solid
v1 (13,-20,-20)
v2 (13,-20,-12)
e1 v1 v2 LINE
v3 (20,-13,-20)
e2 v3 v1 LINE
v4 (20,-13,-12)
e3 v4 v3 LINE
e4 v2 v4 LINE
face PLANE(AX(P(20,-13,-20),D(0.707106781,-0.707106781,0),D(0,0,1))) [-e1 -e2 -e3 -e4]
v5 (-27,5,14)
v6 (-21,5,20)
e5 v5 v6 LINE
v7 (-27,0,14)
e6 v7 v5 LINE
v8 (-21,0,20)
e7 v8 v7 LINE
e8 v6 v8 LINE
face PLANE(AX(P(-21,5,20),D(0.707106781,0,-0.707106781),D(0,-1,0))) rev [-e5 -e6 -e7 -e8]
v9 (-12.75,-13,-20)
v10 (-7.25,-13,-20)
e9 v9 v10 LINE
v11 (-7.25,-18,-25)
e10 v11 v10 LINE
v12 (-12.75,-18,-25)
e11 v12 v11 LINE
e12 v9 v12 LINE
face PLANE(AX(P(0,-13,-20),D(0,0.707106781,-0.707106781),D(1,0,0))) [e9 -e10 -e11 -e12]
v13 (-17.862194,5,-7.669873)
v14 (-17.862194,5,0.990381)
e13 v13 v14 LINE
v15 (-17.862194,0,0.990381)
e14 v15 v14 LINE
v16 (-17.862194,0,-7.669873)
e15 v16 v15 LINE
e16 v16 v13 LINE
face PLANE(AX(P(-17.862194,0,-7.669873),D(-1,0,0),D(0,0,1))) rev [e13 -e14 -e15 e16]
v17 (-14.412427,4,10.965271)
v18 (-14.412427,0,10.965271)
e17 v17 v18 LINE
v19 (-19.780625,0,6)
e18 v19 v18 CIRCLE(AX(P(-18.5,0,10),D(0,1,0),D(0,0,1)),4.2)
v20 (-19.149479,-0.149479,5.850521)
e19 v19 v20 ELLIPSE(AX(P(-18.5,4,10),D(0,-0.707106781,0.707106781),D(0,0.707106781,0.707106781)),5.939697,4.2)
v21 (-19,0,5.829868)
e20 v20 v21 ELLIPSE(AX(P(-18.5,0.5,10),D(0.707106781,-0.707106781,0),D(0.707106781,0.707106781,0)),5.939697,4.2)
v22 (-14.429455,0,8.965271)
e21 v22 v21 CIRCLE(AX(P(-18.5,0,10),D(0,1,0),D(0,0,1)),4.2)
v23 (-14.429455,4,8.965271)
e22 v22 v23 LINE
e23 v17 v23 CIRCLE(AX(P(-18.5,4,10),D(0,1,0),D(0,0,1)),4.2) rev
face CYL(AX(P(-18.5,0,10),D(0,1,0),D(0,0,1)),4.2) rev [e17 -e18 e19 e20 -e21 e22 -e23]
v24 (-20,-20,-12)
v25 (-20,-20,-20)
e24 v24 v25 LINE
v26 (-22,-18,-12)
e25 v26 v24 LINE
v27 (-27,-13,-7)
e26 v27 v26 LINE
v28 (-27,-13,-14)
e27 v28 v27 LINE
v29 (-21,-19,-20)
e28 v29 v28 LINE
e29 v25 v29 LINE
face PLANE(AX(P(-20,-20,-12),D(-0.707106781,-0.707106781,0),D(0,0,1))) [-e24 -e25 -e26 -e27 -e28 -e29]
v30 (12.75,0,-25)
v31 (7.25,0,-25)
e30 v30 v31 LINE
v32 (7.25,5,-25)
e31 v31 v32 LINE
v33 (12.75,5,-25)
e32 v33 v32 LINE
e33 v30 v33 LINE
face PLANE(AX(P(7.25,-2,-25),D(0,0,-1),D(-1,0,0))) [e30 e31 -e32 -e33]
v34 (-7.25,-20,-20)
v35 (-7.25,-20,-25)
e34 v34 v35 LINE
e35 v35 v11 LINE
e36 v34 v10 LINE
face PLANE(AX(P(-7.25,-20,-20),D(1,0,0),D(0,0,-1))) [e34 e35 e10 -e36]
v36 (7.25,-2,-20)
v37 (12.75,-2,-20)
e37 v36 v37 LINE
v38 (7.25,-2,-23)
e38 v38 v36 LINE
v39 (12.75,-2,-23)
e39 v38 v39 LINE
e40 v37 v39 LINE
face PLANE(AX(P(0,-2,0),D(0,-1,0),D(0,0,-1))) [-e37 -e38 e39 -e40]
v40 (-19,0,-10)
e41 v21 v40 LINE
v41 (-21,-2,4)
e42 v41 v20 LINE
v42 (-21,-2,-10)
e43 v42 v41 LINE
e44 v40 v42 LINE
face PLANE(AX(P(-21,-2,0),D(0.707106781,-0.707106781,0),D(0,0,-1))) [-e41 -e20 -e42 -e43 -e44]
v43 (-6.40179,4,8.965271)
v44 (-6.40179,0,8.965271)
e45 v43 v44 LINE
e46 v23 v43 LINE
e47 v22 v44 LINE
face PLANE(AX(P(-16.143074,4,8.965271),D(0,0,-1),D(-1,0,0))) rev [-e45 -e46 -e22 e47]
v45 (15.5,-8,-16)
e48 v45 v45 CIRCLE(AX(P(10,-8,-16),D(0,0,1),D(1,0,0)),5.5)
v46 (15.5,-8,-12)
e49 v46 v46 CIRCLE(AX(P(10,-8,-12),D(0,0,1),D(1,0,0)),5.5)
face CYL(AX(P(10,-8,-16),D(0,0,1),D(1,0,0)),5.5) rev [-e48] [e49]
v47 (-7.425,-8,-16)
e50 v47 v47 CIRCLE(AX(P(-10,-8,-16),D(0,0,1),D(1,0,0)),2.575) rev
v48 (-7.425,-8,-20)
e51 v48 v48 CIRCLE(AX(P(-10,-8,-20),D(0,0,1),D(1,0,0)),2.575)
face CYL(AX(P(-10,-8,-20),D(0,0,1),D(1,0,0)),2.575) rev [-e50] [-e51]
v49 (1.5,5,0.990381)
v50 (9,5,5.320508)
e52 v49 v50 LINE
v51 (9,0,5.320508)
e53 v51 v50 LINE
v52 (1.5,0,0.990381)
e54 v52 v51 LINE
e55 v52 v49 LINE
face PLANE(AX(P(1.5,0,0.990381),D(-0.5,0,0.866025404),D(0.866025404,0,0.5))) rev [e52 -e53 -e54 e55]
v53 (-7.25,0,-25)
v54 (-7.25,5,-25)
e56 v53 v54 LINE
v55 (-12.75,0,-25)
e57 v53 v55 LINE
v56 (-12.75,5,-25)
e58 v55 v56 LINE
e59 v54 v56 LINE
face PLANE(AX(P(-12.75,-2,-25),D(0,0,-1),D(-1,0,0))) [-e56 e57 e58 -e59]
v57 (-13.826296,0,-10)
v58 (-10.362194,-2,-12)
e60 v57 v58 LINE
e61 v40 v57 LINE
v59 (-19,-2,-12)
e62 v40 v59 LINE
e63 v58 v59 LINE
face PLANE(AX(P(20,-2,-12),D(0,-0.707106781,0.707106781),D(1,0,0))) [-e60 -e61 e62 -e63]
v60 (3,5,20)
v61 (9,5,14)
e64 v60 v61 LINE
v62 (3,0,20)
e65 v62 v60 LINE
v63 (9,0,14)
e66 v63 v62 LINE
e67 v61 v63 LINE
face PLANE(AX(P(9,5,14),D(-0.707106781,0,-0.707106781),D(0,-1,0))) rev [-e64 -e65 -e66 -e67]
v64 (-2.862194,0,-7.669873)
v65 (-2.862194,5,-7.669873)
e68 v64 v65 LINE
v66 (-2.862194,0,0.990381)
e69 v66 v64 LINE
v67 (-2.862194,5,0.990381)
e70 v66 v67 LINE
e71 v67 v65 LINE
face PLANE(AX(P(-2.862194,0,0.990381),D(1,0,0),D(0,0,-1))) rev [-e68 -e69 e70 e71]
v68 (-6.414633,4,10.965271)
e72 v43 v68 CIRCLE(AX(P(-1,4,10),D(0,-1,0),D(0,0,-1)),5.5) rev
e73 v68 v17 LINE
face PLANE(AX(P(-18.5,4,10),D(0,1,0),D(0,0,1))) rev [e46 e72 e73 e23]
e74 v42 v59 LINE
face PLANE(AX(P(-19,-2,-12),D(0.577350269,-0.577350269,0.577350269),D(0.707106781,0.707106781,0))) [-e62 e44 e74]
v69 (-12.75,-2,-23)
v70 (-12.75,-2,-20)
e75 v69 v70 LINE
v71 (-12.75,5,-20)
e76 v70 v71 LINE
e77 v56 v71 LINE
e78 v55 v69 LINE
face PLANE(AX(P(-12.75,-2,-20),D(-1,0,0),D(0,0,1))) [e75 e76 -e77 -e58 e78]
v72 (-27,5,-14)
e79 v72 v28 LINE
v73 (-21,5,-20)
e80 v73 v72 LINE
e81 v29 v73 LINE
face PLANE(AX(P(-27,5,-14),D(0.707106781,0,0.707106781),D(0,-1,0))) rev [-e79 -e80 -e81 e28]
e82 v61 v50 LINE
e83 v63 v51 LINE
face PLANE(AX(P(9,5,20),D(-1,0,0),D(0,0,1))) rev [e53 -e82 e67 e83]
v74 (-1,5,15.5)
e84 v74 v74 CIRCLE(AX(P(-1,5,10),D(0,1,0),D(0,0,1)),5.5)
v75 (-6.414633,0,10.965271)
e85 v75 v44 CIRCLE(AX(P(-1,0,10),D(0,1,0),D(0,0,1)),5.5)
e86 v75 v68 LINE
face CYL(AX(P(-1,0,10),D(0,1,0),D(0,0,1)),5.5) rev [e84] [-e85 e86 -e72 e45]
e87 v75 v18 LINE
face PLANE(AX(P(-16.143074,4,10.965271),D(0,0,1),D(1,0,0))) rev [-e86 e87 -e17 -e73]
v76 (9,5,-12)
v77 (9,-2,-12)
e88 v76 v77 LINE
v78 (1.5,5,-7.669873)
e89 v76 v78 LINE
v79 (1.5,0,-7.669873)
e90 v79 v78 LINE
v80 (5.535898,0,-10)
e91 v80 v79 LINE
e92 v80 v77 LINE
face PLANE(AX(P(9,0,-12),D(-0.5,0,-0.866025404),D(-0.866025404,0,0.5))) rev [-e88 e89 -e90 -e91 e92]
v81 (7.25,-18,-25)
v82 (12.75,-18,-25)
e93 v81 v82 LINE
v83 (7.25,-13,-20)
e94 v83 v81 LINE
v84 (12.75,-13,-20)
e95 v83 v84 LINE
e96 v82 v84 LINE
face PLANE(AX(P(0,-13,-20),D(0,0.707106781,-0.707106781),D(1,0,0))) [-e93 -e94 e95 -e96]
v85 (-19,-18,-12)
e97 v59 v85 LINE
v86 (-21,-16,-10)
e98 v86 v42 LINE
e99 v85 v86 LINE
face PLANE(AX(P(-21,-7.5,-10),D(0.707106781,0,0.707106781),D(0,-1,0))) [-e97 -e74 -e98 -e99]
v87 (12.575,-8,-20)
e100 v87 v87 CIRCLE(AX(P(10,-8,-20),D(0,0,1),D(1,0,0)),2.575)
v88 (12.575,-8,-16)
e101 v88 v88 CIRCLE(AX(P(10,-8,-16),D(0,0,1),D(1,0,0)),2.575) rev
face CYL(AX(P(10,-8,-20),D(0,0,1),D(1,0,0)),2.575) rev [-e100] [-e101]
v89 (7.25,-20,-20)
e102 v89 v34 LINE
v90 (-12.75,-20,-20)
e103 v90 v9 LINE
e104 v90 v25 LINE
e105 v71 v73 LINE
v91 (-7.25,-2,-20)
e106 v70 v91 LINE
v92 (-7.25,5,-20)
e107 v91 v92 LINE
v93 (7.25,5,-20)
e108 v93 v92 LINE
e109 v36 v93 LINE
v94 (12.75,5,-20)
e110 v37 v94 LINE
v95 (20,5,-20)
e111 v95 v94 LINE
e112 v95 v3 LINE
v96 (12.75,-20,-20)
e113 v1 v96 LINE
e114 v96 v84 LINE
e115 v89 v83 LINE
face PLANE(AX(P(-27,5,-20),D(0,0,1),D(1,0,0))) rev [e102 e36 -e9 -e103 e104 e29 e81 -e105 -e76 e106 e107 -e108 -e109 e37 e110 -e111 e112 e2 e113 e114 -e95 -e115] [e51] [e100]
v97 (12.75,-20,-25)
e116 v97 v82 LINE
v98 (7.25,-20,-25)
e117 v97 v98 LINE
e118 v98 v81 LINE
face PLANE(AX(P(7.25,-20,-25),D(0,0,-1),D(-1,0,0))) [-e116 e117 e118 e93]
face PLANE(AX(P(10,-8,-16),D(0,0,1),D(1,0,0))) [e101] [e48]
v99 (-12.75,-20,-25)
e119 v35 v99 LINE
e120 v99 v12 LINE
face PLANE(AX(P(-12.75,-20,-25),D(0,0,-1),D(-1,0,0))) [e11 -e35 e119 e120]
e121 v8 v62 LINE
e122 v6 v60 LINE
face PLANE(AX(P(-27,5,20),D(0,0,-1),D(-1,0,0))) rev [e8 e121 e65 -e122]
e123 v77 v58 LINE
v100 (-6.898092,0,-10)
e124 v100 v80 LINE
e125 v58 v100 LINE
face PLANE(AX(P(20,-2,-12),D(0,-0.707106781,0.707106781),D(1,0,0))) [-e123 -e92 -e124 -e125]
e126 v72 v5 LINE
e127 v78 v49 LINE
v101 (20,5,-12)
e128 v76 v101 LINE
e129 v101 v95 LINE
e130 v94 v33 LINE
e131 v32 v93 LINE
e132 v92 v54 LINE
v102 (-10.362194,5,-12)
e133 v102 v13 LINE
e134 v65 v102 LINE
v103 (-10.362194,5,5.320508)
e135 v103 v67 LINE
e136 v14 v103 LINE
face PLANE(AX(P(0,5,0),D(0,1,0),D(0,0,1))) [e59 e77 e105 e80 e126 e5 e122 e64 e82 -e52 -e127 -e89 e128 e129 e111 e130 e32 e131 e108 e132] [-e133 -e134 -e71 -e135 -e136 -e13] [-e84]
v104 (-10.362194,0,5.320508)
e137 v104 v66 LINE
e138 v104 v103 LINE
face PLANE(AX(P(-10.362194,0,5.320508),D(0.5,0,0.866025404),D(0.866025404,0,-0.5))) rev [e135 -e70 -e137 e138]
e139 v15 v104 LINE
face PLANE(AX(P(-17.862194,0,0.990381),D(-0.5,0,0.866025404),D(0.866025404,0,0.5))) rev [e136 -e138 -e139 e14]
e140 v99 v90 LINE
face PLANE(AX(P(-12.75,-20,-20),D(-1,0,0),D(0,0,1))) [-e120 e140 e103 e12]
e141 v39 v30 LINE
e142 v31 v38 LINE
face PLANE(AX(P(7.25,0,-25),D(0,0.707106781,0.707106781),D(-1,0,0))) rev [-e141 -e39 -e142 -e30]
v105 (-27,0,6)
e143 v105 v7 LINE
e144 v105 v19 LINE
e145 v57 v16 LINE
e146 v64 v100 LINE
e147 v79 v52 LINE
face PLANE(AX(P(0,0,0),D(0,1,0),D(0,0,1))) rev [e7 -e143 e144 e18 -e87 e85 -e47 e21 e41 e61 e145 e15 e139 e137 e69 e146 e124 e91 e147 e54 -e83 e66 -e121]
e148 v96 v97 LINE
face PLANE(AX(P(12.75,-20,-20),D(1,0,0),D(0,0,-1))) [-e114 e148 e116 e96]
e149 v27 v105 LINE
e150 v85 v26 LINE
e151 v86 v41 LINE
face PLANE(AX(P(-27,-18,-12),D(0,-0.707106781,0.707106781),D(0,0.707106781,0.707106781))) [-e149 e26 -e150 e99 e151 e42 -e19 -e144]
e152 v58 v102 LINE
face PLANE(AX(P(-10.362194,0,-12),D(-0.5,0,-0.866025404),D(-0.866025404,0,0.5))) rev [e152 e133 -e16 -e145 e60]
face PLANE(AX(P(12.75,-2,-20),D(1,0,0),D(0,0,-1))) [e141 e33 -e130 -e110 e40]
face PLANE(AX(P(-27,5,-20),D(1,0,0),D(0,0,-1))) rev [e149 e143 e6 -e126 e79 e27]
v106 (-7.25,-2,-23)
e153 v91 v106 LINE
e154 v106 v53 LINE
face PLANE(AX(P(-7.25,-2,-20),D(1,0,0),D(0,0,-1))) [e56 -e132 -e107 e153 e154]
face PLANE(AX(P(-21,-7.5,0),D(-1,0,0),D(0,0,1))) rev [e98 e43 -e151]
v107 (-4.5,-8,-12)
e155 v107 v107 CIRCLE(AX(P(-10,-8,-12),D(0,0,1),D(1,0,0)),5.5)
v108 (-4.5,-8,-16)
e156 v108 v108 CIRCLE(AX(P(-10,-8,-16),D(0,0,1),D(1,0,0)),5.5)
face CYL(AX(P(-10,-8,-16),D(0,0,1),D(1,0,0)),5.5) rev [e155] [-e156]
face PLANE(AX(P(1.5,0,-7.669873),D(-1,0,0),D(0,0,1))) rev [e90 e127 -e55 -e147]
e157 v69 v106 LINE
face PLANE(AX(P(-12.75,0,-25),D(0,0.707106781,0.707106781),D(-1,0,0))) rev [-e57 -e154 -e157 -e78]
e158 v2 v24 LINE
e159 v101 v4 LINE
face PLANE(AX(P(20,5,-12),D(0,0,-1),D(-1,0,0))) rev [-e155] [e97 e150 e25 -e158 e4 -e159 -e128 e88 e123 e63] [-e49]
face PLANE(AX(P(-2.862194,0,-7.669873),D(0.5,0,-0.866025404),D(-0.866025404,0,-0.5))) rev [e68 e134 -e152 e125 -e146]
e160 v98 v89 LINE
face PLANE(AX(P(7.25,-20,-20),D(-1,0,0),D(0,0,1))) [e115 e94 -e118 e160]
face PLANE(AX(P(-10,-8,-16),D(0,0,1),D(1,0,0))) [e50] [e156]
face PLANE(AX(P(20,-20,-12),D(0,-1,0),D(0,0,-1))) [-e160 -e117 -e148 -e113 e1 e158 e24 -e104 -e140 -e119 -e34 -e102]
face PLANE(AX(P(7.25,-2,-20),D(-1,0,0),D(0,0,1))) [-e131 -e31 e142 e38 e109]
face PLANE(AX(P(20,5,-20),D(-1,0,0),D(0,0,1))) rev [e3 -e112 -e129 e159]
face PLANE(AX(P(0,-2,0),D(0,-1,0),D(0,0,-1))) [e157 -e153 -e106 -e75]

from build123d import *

# Parameters (mm, degrees)
BOSS_EXTRUDE1_DEPTH = 5
SKETCH3_W           = 47
SKETCH3_H           = 25
BOSS_EXTRUDE2_DEPTH = 8
RIB2_REACH          = 56.854
SKETCH9_WALL_W      = 137.164549338
SKETCH9_WALL_H      = 6
SKETCH2_R           = 5.5
SKETCH2_R_2         = 4.2
CUT_EXTRUDE1_DEPTH  = 5
SKETCH4_R           = 2.575
CUT_EXTRUDE2_DEPTH  = 8
SKETCH11_W          = 5.5
SKETCH11_H          = 5
BOSS_EXTRUDE5_DEPTH = 7
SKETCH12_R          = 4.941066883
BOSS_EXTRUDE6_DEPTH = 1
SKETCH7_R           = 5.5
CUT_EXTRUDE3_DEPTH  = 4
SKETCH10_W          = 11.059960659
SKETCH10_H          = 2
CUT_EXTRUDE4_DEPTH  = 4
CHAMFER1_SIZE       = 6
CHAMFER2_SIZE       = 7
CHAMFER4_SIZE       = 2
LPATTERN1_COUNT     = 2
LPATTERN1_PITCH     = 18
CHAMFER5_SIZE       = 2
CHAMFER6_SIZE       = 5


# Some blends are built 0.0001 mm under size
with BuildPart() as part:
    # Sketch1 → Boss-Extrude1 (new body)
    with BuildSketch(Plane(origin=(0, 0, 0), x_dir=(1, 0, 0), z_dir=(0, 1, 0))):
        Polygon((20, 20), (20, 12), (9, 12), (9, -20), (-27, -20), (-27, 20), align=None)
    extrude(amount=BOSS_EXTRUDE1_DEPTH)

    # Sketch3 → Boss-Extrude2 (add)
    with BuildSketch(Plane(origin=(0, 0, -20), x_dir=(-1, 0, 0), z_dir=(0, 0, -1))):
        with Locations((3.5, -7.5)):
            Rectangle(SKETCH3_W, SKETCH3_H)
    extrude(amount=-BOSS_EXTRUDE2_DEPTH)

    # Sketch9 wall → Rib2 (add, up to next)
    with BuildSketch(Plane(origin=(-27, -9, -3), x_dir=(0, 0.707106781187, 0.707106781187), z_dir=(0, 0.707106781187, -0.707106781187)), mode=Mode.PRIVATE) as rib2_sk1:
        with Locations((0, 3)):
            Rectangle(SKETCH9_WALL_W, SKETCH9_WALL_H)
    rib2_tool1 = extrude(rib2_sk1.sketch, amount=RIB2_REACH, mode=Mode.PRIVATE) - part.part
    add(rib2_tool1.solids().sort_by_distance((-27, -9, -3))[0])

    # Sketch2 → Cut-Extrude1 (cut)
    with BuildSketch(Plane(origin=(0, 5, 0), x_dir=(1, 0, 0), z_dir=(0, 1, 0))):
        with Locations(Location((-1, -10, 0), (0, 0, 270))):
            Circle(SKETCH2_R)
        with Locations(Location((-18.5, -10, 0), (0, 0, 270))):
            Circle(SKETCH2_R_2)
        Polygon((9, -5.320508076), (16.5, -0.990381057), (16.5, 7.669872981), (9, 12), (1.5, 7.669872981), (1.5, -0.990381057), align=None)
        Polygon((-10.36219397, -5.320508076), (-2.86219397, -0.990381057), (-2.86219397, 7.669872981), (-10.36219397, 12), (-17.86219397, 7.669872981), (-17.86219397, -0.990381057), align=None)
    extrude(amount=-CUT_EXTRUDE1_DEPTH, mode=Mode.SUBTRACT)

    # Sketch4 → Cut-Extrude2 (cut)
    with BuildSketch(Plane.XY.offset(-12)):
        with Locations((-10, -8)):
            Circle(SKETCH4_R)
        with Locations((10, -8)):
            Circle(SKETCH4_R)
    extrude(amount=-CUT_EXTRUDE2_DEPTH, mode=Mode.SUBTRACT)

    # Sketch11 → Boss-Extrude5 (add)
    with BuildSketch(Plane(origin=(0, 5, 0), x_dir=(1, 0, 0), z_dir=(0, 1, 0))):
        with Locations((-10, 22.5)):
            Rectangle(SKETCH11_W, SKETCH11_H)
        with Locations((10, 22.5)):
            Rectangle(SKETCH11_W, SKETCH11_H)
    boss_extrude5 = extrude(amount=-BOSS_EXTRUDE5_DEPTH)

    # Sketch12 → Boss-Extrude6 (add)
    with BuildSketch(Plane(origin=(0, 5, 0), x_dir=(1, 0, 0), z_dir=(0, 1, 0))):
        with Locations((-18.5, -10)):
            Circle(SKETCH12_R)
    extrude(amount=-BOSS_EXTRUDE6_DEPTH)

    # Sketch7 → Cut-Extrude3 (cut)
    with BuildSketch(Plane.XY.offset(-12)):
        with Locations((-10, -8)):
            Circle(SKETCH7_R)
        with Locations((10, -8)):
            Circle(SKETCH7_R)
    extrude(amount=-CUT_EXTRUDE3_DEPTH, mode=Mode.SUBTRACT)

    # Sketch10 → Cut-Extrude4 (cut)
    with BuildSketch(Plane.XZ):
        with Locations((-10.613093562, 9.96527114)):
            Rectangle(SKETCH10_W, SKETCH10_H)
    extrude(amount=-CUT_EXTRUDE4_DEPTH, mode=Mode.SUBTRACT)

    # Chamfer1
    chamfer1_edges = [part.edges().sort_by_distance(p)[0] for p in [
        (-27, -7.5, -20),
        (9, 2.5, 20),
        (-27, 2.5, 20),
    ]]
    chamfer(chamfer1_edges, length=CHAMFER1_SIZE)

    # Chamfer2
    chamfer2_edges = [part.edges().sort_by_distance(p)[0] for p in [
        (-27, -20, -13),
        (20, -20, -16),
    ]]
    chamfer(chamfer2_edges, length=CHAMFER2_SIZE)

    # Chamfer4
    # the kernel refuses this chamfer: 2 mm, written as the material it adds along each edge
    with BuildSketch(Plane(origin=(-19.666666667, -1.333333333, -10.666666667), x_dir=(-0.7071067811865462, -0.7071067811865488, 1.1932702685996668e-13), z_dir=(-0.5773502691896611, 0.5773502691895617, -0.5773502691896545))) as chamfer4_piece_1_section:
        Polygon((-1.414213562, 0.816496581), (1.414213562, 0.816496581), (0, -1.632993162), align=None)
    chamfer4_piece_1 = extrude(amount=2.540341184, mode=Mode.PRIVATE)
    chamfer4_piece_1 = split(chamfer4_piece_1, bisect_by=Plane(origin=(-21, 0, -12), z_dir=(0, -1, 0)), keep=Keep.TOP, mode=Mode.PRIVATE)
    chamfer4_piece_1 = split(chamfer4_piece_1, bisect_by=Plane(origin=(-21, 0, -12), z_dir=(1, 0, 0)), keep=Keep.TOP, mode=Mode.PRIVATE)
    chamfer4_piece_1 = split(chamfer4_piece_1, bisect_by=Plane(origin=(-21, 0, -12), z_dir=(0, 0, 1)), keep=Keep.TOP, mode=Mode.PRIVATE)
    add(chamfer4_piece_1)
    with BuildSketch(Plane(origin=(14.143365976, 0, -12), x_dir=(0, -0.9996219169112968, -0.027495876610586494), z_dir=(-1, 0, 0))) as chamfer4_piece_2_section:
        Polygon((CHAMFER4_SIZE * 0.999621916911, CHAMFER4_SIZE * 0.0274958766106), (-CHAMFER4_SIZE * 0.0274958766106, CHAMFER4_SIZE * 0.999621916911), (0, 0), align=None)
    chamfer4_piece_2 = extrude(amount=24.505559946, mode=Mode.PRIVATE)
    chamfer4_piece_2 = split(chamfer4_piece_2, bisect_by=Plane(origin=(1.470049267, -0.68923776, -7.652580917), z_dir=(-0.5000000000000001, 0, -0.8660254037844387)), keep=Keep.TOP, mode=Mode.PRIVATE)
    chamfer4_piece_2 = split(chamfer4_piece_2, bisect_by=Plane(origin=(-2.832243237, -0.68923776, -7.652580917), z_dir=(0.5000000000000001, 0, -0.8660254037844386)), keep=Keep.TOP, mode=Mode.PRIVATE)
    add(chamfer4_piece_2)
    with BuildSketch(Plane(origin=(-21, -23.143365976, -12), x_dir=(0.9996219169112965, 0, -0.027495876610597728), z_dir=(0, 1, 0))) as chamfer4_piece_3_section:
        Polygon((CHAMFER4_SIZE * 0.999621916911, -CHAMFER4_SIZE * 0.0274958766106), (-CHAMFER4_SIZE * 0.0274958766106, -CHAMFER4_SIZE * 0.999621916911), (0, 0), align=None)
    chamfer4_piece_3 = extrude(amount=23.143365976, mode=Mode.PRIVATE)
    chamfer4_piece_3 = split(chamfer4_piece_3, bisect_by=Plane(origin=(-20.326923077, -13.009615385, -7.009615385), z_dir=(0, 0.7071067811865476, -0.7071067811865476)), keep=Keep.TOP, mode=Mode.PRIVATE)
    add(chamfer4_piece_3)
    with BuildSketch(Plane(origin=(-21, 0, -17.143365976), x_dir=(0.9996219169112968, 0.02749587661058649, 0), z_dir=(0, 0, 1))) as chamfer4_piece_4_section:
        Polygon((CHAMFER4_SIZE * 0.999621916911, -CHAMFER4_SIZE * 0.0274958766106), (-CHAMFER4_SIZE * 0.0274958766106, -CHAMFER4_SIZE * 0.999621916911), (0, 0), align=None)
    chamfer4_piece_4 = extrude(amount=28.286731952, mode=Mode.PRIVATE)
    chamfer4_piece_4 = split(chamfer4_piece_4, bisect_by=Plane(origin=(-20.327046258, -4.990950262, 1.009049738), z_dir=(0, 0.7071067811865476, -0.7071067811865476)), keep=Keep.TOP, mode=Mode.PRIVATE)
    chamfer4_piece_4 = chamfer4_piece_4 - Plane(origin=(-18.5, -0.653916776, 10), x_dir=(0, 0, 1), z_dir=(0, 1, 0)) * Cylinder(4.2, 65, mode=Mode.PRIVATE)
    add(chamfer4_piece_4)
    with BuildSketch(Plane(origin=(-10.36219397, 0, -12), x_dir=(0, -0.9996219169112998, -0.027495876610477744), z_dir=(-1, 0, 0))) as chamfer4_piece_5_section:
        Polygon((CHAMFER4_SIZE * 0.999621916911, CHAMFER4_SIZE * 0.0274958766106), (-CHAMFER4_SIZE * 0.0274958766105, CHAMFER4_SIZE * 0.999621916911), (0, 0), align=None)
    chamfer4_piece_5 = extrude(amount=15.781172006, mode=Mode.PRIVATE)
    chamfer4_piece_5 = split(chamfer4_piece_5, bisect_by=Plane(origin=(-15.029121281, -0.686960661, -9.305548261), z_dir=(-0.5000000000000003, 0, -0.8660254037844387)), keep=Keep.TOP, mode=Mode.PRIVATE)
    add(chamfer4_piece_5)

    # LPattern1: Boss-Extrude5 ×2
    with Locations(*[(0, -i * LPATTERN1_PITCH, 0) for i in range(1, LPATTERN1_COUNT)]):
        add(boss_extrude5)

    # Chamfer5
    chamfer5_edges = [part.edges().sort_by_distance(p)[0] for p in [
        (-10, -2, -25),
        (10, -2, -25),
    ]]
    chamfer(chamfer5_edges, length=CHAMFER5_SIZE)

    # Chamfer6
    chamfer6_edges = [part.edges().sort_by_distance(p)[0] for p in [
        (-10, -13, -25),
        (10, -13, -25),
    ]]
    chamfer(chamfer6_edges, length=CHAMFER6_SIZE - 0.0001)  # a hair under: the kernel refuses the full size


solid = part.part
